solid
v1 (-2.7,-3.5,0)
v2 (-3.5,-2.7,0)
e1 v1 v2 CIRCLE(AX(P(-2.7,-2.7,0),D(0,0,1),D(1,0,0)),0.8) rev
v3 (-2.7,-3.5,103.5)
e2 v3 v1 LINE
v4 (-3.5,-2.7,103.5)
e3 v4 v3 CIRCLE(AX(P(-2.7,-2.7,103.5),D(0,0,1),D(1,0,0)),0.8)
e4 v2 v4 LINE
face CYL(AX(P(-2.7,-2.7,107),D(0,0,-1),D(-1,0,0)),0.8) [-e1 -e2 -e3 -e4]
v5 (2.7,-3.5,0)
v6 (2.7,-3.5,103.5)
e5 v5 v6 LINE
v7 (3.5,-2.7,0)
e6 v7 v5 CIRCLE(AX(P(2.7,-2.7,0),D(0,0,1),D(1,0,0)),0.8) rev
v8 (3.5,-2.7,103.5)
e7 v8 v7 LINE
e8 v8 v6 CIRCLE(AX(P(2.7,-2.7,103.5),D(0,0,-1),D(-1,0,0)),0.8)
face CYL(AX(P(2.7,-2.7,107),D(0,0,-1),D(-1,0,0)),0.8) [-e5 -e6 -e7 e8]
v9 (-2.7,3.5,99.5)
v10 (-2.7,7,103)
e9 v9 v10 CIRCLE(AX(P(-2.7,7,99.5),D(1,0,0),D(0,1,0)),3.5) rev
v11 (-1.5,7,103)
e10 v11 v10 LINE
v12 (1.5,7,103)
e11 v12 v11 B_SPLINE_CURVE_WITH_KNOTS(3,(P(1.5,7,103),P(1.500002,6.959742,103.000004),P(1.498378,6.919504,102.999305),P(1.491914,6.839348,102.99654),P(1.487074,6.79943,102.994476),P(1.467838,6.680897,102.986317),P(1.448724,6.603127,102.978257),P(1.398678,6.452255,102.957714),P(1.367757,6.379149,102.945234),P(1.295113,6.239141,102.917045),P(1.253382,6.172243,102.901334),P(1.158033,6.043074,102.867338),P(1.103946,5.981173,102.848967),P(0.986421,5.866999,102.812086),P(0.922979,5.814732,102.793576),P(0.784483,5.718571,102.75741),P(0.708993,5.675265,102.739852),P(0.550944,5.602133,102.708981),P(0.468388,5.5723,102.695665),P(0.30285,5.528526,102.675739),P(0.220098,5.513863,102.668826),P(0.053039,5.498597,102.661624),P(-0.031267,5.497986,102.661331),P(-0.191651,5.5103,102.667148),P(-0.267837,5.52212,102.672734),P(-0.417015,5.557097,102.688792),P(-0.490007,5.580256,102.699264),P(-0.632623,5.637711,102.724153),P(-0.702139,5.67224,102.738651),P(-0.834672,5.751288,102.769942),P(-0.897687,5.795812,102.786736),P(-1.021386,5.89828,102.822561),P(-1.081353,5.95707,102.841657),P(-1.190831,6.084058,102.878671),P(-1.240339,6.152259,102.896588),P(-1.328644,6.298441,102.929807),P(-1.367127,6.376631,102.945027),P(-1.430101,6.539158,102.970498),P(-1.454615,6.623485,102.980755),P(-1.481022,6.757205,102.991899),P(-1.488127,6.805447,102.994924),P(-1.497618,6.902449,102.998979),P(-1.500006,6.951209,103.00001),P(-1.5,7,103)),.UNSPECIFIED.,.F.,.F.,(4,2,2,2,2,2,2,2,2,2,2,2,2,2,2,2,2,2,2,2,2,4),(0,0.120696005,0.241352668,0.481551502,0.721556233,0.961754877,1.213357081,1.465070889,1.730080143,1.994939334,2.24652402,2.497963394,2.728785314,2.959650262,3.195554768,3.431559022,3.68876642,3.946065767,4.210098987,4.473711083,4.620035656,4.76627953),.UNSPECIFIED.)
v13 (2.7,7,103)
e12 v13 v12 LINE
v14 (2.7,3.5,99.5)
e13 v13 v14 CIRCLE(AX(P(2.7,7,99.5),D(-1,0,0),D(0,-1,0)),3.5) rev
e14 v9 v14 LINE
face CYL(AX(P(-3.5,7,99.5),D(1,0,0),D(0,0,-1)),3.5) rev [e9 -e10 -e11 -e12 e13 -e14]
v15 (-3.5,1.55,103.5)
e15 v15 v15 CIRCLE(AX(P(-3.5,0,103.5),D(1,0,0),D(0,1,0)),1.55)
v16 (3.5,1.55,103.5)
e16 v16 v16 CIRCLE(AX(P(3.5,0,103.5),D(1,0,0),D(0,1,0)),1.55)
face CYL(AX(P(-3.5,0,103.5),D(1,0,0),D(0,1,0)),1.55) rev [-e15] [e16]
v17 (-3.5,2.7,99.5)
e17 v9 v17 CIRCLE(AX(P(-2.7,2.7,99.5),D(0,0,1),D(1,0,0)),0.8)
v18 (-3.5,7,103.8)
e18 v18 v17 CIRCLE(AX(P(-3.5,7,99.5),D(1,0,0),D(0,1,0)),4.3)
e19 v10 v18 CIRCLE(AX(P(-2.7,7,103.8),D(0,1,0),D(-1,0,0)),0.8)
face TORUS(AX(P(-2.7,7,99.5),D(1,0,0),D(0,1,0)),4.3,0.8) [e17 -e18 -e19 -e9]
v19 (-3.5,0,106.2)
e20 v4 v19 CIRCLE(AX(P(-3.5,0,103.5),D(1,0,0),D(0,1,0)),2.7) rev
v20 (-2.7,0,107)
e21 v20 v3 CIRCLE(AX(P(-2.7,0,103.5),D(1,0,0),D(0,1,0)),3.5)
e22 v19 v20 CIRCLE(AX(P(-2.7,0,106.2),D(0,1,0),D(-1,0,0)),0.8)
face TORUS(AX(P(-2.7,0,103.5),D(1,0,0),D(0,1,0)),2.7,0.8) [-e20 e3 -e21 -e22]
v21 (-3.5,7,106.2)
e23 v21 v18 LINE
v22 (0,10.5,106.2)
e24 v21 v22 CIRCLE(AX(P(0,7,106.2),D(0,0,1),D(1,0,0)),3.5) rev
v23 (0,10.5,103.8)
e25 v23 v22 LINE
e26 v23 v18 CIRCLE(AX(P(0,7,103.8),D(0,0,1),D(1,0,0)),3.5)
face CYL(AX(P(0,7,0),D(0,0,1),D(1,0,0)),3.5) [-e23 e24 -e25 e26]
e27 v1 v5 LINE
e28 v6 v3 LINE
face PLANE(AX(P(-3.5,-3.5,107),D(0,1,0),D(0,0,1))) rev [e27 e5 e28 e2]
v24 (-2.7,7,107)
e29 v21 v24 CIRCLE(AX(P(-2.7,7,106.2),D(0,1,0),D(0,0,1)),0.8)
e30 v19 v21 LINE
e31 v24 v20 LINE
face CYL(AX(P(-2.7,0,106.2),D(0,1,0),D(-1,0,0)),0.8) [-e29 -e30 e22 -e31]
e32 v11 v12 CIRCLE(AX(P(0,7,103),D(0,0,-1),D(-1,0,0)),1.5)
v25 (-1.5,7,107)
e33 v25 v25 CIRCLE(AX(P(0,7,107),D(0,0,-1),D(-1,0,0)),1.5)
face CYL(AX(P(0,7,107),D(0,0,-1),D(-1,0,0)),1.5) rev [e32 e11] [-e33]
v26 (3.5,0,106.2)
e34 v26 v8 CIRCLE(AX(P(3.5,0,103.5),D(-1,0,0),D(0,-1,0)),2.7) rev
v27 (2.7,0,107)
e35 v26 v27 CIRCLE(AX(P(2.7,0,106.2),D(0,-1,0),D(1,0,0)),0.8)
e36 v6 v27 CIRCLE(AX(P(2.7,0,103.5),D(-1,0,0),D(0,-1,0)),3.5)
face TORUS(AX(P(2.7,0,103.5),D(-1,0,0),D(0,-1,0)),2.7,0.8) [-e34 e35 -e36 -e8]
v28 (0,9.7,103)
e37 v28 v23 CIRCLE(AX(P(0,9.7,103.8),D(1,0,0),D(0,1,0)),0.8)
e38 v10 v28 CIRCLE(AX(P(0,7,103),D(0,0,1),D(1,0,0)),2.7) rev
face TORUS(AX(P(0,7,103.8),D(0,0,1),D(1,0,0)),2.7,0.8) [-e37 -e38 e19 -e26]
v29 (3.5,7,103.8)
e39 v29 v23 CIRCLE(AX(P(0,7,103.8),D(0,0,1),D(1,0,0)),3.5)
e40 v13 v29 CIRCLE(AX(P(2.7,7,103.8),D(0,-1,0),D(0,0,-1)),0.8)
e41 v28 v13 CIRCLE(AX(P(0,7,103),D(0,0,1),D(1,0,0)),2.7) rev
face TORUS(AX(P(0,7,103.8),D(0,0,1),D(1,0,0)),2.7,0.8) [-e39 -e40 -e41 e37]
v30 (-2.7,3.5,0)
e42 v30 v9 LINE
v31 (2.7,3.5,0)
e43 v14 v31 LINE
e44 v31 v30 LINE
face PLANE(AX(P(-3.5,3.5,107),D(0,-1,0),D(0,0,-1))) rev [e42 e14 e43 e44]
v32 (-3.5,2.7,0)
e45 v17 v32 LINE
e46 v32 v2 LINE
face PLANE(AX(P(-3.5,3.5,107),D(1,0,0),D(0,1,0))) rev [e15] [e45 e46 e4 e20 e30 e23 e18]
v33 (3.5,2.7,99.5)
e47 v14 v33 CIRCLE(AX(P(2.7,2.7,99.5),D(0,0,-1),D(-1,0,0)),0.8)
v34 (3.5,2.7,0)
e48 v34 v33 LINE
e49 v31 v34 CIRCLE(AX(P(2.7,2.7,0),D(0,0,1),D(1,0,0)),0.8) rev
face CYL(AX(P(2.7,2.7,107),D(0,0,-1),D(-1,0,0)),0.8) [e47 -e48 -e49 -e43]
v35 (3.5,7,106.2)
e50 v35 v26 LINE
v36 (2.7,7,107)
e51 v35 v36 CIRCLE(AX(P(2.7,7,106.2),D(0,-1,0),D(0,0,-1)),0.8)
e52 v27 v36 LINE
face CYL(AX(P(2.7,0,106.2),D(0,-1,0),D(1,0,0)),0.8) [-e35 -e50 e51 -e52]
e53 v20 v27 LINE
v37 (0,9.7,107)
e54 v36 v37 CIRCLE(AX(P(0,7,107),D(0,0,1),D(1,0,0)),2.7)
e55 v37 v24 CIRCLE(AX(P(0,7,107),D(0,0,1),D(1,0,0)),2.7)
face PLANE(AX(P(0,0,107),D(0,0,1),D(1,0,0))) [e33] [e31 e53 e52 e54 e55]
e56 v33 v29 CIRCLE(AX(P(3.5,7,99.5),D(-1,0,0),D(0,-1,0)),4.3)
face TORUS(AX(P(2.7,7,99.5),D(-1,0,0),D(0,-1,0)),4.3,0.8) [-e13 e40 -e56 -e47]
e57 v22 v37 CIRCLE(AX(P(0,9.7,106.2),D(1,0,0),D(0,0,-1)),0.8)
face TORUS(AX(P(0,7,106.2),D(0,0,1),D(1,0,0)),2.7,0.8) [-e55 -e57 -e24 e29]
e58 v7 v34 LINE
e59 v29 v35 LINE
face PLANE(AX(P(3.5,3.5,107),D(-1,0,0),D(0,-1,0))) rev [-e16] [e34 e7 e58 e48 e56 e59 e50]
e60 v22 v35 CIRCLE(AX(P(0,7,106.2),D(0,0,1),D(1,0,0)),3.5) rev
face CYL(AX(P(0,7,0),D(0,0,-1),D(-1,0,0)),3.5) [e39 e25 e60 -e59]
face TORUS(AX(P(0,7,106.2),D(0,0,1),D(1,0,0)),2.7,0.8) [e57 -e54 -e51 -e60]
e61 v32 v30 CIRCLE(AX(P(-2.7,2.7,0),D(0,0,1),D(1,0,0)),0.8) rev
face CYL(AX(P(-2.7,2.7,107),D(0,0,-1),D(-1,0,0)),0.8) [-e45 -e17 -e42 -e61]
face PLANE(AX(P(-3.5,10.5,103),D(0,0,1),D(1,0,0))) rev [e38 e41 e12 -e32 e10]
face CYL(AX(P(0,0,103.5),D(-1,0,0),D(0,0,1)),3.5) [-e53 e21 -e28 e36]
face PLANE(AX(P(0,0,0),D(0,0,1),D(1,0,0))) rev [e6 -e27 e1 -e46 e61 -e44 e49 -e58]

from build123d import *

# Parameters (mm, degrees)
SKETCH_1_W          = 7
SKETCH_1_H          = 7
EXTRUDE_1_DEPTH     = 107
FILLET_1_R          = 3.5
SKETCH_5_R          = 1.55
CUT_EXTRUDE_2_DEPTH = 108.285833175
SKETCH_6_W          = 7
SKETCH_6_H          = 4
EXTRUDE_2_DEPTH     = 7
FILLET_2_R          = 3.5
SKETCH_7_R          = 1.5
CUT_EXTRUDE_3_DEPTH = 104.592953428
FILLET_3_R          = 3.5
FILLET_4_R          = 0.8
FILLET_5_R          = 0.8


# Some blends are built 0.0001 mm under size
with BuildPart() as part:
    # 草图1 → 凸台-拉伸1 (new body)
    with BuildSketch(Plane.XY):
        Rectangle(SKETCH_1_W, SKETCH_1_H)
    extrude(amount=EXTRUDE_1_DEPTH)

    # 圆角1
    fillet_1_edges = [part.edges().sort_by_distance(p)[0] for p in [
        (0, -3.5, 107),
    ]]
    fillet(fillet_1_edges, radius=FILLET_1_R)

    # 草图5 → 切除-拉伸2 (cut, through all)
    with BuildSketch(Plane(origin=(3.5, 0, 0), x_dir=(0, 0, -1), z_dir=(1, 0, 0))):
        with Locations(Location((-103.5, 0, 0), (0, 0, 90))):
            Circle(SKETCH_5_R)
    extrude(amount=-CUT_EXTRUDE_2_DEPTH, mode=Mode.SUBTRACT)

    # 草图6 → 凸台-拉伸2 (add)
    with BuildSketch(Plane(origin=(0, 3.5, 0), x_dir=(1, 0, 0), z_dir=(0, 1, 0))):
        with Locations((0, -105)):
            Rectangle(SKETCH_6_W, SKETCH_6_H)
    extrude(amount=EXTRUDE_2_DEPTH)

    # 圆角2
    fillet_2_edges = [part.edges().sort_by_distance(p)[0] for p in [
        (3.5, 10.5, 105),
        (-3.5, 10.5, 105),
    ]]
    fillet(fillet_2_edges, radius=FILLET_2_R - 0.0001)  # a hair under: the kernel refuses the full size

    # 草图7 → 切除-拉伸3 (cut, through all)
    with BuildSketch(Plane(origin=(0, 0, 103), x_dir=(-1, 0, 0), z_dir=(0, 0, -1))):
        with Locations((0, 7)):
            Circle(SKETCH_7_R)
    extrude(amount=-CUT_EXTRUDE_3_DEPTH, mode=Mode.SUBTRACT)

    # 圆角3
    # the kernel refuses this fillet: 3.5 mm, written as the material it adds along each edge
    with BuildSketch(Plane(origin=(-3.5, 3.5, 103), x_dir=(0, 1, 0), z_dir=(1, 0, 0))) as fillet_3_piece_1_section:
        with BuildLine():
            CenterArc((FILLET_3_R, -FILLET_3_R), FILLET_3_R, 90, 90)
            Line((0, -FILLET_3_R), (0, 0))
            Line((0, 0), (FILLET_3_R, 0))
        make_face()
    fillet_3_piece_1 = extrude(amount=7, mode=Mode.PRIVATE)
    fillet_3_piece_1 = fillet_3_piece_1 - Plane(origin=(0, 7, 102.188347769), x_dir=(-1, 0, 0), z_dir=(0, 0, -1)) * Cylinder(1.5, 28, mode=Mode.PRIVATE)
    add(fillet_3_piece_1)

    # 圆角4
    fillet_4_edges = [part.edges().sort_by_distance(p)[0] for p in [
        (-2.474903023, 9.474903023, 103),
        (2.474903023, 9.474903023, 103),
        (3.5, 3.5, 49.75),
        (-3.5, 3.5, 49.75),
        (-3.5, 4.525126266, 101.974873734),
        (3.5, 4.525126266, 101.974873734),
    ]]
    fillet(fillet_4_edges, radius=FILLET_4_R)

    # 圆角5
    fillet_5_edges = [part.edges().sort_by_distance(p)[0] for p in [
        (3.5, 3.50005, 107),
        (3.5, -3.5, 51.75),
        (3.5, -2.474873734, 105.974873734),
        (-3.5, -3.5, 51.75),
        (-3.5, -2.474873734, 105.974873734),
        (-3.5, 3.50005, 107),
        (-2.474903023, 9.474903023, 107),
        (2.474903023, 9.474903023, 107),
    ]]
    fillet(fillet_5_edges, radius=FILLET_5_R)


solid = part.part
